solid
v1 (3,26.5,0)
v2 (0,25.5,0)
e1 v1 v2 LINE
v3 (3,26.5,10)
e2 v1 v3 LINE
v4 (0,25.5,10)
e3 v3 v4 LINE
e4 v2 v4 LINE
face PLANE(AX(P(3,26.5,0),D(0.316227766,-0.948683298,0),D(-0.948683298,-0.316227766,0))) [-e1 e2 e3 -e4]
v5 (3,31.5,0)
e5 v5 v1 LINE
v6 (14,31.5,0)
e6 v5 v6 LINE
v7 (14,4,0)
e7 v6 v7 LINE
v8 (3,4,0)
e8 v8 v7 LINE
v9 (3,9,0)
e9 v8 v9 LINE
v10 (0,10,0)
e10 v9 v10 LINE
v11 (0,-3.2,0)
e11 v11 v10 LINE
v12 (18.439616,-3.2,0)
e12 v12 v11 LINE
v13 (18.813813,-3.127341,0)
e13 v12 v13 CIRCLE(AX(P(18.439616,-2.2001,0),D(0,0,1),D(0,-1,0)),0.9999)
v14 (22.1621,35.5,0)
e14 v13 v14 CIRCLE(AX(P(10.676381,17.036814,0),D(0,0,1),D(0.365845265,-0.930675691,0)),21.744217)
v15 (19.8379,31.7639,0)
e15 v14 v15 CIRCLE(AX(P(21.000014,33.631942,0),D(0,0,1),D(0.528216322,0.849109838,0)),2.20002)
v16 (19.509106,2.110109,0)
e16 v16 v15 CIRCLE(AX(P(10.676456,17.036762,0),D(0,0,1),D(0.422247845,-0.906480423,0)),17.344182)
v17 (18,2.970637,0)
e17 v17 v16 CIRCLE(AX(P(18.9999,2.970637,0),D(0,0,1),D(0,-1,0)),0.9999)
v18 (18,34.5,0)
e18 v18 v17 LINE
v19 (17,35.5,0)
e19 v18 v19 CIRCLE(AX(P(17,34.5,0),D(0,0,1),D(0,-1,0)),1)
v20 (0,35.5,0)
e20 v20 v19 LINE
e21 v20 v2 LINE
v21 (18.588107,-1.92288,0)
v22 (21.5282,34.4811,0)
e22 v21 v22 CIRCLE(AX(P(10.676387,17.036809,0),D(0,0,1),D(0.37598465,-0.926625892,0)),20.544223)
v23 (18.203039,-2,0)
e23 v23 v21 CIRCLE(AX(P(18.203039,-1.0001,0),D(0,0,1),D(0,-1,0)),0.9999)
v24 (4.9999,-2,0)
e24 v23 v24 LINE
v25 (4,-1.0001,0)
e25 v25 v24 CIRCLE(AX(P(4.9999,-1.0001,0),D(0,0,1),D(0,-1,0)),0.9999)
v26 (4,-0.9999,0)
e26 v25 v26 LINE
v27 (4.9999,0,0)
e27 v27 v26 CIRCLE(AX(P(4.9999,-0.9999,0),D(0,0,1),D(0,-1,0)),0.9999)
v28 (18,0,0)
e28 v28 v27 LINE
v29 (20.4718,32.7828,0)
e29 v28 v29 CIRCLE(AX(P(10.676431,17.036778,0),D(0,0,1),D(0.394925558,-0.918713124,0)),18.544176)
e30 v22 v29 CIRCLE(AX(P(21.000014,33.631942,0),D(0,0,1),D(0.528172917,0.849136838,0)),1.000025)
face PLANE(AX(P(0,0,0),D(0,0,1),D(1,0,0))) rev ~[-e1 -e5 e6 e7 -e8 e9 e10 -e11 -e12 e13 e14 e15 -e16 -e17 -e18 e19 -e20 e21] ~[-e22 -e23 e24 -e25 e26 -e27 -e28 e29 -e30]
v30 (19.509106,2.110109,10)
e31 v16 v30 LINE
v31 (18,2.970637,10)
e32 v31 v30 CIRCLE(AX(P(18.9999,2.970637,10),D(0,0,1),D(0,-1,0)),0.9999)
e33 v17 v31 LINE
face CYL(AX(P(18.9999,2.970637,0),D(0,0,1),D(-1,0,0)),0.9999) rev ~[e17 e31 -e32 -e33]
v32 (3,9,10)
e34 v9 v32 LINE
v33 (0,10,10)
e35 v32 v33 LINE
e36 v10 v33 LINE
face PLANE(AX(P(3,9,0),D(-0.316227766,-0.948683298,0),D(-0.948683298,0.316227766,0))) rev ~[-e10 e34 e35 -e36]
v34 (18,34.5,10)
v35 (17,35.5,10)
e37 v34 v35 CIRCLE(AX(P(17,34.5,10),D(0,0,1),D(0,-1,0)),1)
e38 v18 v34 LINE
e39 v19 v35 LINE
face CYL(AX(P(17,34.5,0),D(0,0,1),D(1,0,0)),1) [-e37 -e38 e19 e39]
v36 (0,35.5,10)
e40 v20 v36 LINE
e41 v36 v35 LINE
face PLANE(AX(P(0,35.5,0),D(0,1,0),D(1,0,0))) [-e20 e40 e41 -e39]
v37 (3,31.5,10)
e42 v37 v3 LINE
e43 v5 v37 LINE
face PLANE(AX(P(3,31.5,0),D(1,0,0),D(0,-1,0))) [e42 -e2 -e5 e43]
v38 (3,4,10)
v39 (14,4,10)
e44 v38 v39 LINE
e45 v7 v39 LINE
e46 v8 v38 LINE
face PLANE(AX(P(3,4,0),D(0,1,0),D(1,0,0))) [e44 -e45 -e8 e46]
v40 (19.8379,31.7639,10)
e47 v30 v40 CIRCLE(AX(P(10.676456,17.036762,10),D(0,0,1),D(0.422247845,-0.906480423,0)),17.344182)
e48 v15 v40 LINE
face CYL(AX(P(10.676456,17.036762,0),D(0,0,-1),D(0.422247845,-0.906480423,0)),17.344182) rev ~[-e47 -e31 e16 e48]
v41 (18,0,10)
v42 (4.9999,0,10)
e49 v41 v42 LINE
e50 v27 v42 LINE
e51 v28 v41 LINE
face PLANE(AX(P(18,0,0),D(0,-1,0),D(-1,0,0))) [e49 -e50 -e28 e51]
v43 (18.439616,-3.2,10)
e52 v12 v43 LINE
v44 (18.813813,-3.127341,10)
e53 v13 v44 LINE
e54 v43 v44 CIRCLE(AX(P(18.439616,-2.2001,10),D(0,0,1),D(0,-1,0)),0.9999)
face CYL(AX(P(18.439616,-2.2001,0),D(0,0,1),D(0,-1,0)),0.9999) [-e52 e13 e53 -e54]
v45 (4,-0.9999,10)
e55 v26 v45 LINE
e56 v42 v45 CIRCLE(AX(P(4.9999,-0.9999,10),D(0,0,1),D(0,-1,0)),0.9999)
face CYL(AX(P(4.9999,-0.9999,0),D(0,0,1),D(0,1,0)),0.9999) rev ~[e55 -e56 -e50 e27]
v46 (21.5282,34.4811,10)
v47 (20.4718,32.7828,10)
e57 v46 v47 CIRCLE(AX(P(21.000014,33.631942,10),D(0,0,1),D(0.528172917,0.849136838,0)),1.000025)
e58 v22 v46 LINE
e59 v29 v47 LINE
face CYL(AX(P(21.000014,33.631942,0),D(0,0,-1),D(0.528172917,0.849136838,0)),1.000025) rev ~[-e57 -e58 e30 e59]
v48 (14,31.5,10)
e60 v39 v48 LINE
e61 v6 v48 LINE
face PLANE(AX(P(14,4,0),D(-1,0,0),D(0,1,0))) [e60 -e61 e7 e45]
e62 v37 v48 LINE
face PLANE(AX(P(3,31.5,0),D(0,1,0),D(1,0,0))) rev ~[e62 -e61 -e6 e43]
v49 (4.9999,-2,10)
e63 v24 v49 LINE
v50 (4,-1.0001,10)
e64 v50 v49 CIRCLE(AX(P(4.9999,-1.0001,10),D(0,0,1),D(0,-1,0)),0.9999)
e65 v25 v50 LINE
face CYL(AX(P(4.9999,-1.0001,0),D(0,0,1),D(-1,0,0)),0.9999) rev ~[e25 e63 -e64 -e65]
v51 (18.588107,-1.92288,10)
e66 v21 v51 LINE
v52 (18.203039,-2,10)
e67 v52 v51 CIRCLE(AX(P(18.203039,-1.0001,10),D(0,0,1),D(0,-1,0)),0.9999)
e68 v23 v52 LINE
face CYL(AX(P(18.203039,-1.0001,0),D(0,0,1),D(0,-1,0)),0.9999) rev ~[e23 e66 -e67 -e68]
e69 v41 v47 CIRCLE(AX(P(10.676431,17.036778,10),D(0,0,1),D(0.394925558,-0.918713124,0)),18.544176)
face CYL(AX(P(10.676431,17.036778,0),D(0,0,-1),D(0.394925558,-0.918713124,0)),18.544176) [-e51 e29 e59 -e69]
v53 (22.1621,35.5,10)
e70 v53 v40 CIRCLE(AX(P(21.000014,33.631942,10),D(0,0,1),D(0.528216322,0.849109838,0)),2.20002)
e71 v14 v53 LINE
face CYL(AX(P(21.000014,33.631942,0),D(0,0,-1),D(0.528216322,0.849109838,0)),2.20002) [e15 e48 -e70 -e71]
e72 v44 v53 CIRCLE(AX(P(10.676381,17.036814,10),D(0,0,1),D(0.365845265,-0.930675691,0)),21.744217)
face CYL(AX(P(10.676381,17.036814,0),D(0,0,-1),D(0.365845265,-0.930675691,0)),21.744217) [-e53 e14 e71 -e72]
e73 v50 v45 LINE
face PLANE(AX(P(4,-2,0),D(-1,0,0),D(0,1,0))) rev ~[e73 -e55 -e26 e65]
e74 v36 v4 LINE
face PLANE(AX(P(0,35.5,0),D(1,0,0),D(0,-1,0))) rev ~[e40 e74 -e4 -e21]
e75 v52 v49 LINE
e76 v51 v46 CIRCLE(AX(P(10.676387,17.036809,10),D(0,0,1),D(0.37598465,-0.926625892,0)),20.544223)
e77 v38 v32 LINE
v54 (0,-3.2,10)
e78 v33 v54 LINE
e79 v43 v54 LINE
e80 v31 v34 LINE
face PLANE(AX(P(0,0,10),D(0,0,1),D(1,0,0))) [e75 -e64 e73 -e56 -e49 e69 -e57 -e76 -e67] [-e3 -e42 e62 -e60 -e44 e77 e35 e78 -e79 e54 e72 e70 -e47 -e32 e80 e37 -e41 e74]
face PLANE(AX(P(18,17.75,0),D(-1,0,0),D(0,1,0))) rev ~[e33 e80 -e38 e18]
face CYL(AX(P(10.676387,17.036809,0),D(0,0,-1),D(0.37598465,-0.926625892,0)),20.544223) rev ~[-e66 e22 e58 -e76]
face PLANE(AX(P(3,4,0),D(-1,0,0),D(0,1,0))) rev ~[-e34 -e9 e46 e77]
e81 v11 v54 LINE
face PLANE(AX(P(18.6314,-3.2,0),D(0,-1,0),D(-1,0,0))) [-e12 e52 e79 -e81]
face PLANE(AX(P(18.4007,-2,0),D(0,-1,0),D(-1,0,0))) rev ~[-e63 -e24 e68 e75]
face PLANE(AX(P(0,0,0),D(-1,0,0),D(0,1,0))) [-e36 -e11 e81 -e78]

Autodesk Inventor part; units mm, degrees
ref_plane "YZ Plane" through (0, 0, 0) normal (1, 0, 0) x (0, 1, 0)
ref_plane "XZ Plane" through (0, 0, 0) normal (0, 1, 0) x (-1, 0, 0)
ref_plane "XY Plane" through (0, 0, 0) normal (0, 0, 1) x (1, 0, 0)
sketch "Sketch1" plane through (0, 0, 0) normal (0, 0, 1) x (1, 0, 0)
  line L0 (14, 4) -> (14, 17.75)
  line L1 (14, 17.75) -> (18, 17.75) construction
  line L2 (18, 17.75) -> (18, 0)
  line L3 (3, 4) -> (3, 9)
  line L4 (3, 9) -> (0, 10)
  line L5 (3, 4) -> (14, 4)
  line L6 (14, 31.5) -> (14, 17.75)
  line L7 (18, 17.75) -> (18, 35.5)
  line L8 (3, 31.5) -> (3, 26.5)
  line L9 (3, 26.5) -> (0, 25.5)
  line L10 (3, 31.5) -> (14, 31.5)
  line L11 (-3.6, 0) -> (21.6, 0) construction
  line L12 (0, 35.5) -> (18, 35.5)
  line L13 (18, 0) -> (0, 0)
  line L14 (0, 35.5) -> (0, 25.5)
  line L15 (0, 0) -> (0, 10)
  dimension "d1" = 4
  dimension "d5" = 5
  dimension "d8" = 13.75
  dimension "d9" = 11
  dimension "d26" = 6
  dimension "d27" = 4
  dimension "d28" = 3
extrude "Extrusion1" add sketch "Sketch1" along normal blind 10
sketch "Sketch2" plane through (0, 0, 0) normal (0, 0, 1) x (1, 0, 0)
  circle A0 centre (23, 17.75) radius 5 construction
  line L0 (23, 17.75) -> (18, 17.75) construction
  arc A1 (18.6314, -3.2) -> (22.1621, 35.5) centre (10.6764, 17.0368) ccw
  arc A2 (18, 0) -> (20.4718, 32.7828) centre (10.6764, 17.0368) ccw
  arc A3 (18, 1.3146) -> (19.8379, 31.7639) centre (10.6764, 17.0368) ccw
  arc A4 (22.1621, 35.5) -> (19.8379, 31.7639) centre (21, 33.632) ccw
  arc A5 (21.5282, 34.4811) -> (20.4718, 32.7828) centre (21, 33.632) ccw
  line L1 (0, 0) -> (18, 0) projected
  line L2 (0, 2.0656) -> (0, 0)
  line L3 (18, 0) -> (18, 35.5) projected
  line L4 (18, 1.3146) -> (18, 0)
  line L5 (18, 0) -> (18, 35.5) projected
  arc A6 (18.4007, -2) -> (21.5282, 34.4811) centre (10.6764, 17.0368) ccw
  line L6 (0, 0) -> (18, 0) projected
  line L7 (18.4007, -2) -> (4, -2)
  line L8 (4, -2) -> (4, 0)
  line L9 (18.6314, -3.2) -> (0, -3.2)
  line L10 (0, -3.2) -> (0, 0)
  line L11 (29.1528, 15.4528) -> (31.1455, 15.282) construction
  dimension "d12" = 10
  dimension "d24" = 2.2
  dimension "d33" = 3
  dimension "d39" = 1.2
  dimension "d40" = 4
  dimension "d41" = 2
  dimension "d42" = 2
  dimension "d43" = 1.2
extrude "Extrusion2" add sketch "Sketch2" along normal blind 10 contours L9 L10 L1 L8 L7 A6 A5 A2 L3 A3 A4 A1
fillet "Fillet3" radius 1 5 edges at (18, 1.3146, 5) (18.4007, -2, 5) (4, 0, 5) (4, -2, 5) (18.6314, -3.2, 5)
fillet "Fillet4" radius 1 1 edges at (18, 35.5, 5)
properties part number "Clip"
